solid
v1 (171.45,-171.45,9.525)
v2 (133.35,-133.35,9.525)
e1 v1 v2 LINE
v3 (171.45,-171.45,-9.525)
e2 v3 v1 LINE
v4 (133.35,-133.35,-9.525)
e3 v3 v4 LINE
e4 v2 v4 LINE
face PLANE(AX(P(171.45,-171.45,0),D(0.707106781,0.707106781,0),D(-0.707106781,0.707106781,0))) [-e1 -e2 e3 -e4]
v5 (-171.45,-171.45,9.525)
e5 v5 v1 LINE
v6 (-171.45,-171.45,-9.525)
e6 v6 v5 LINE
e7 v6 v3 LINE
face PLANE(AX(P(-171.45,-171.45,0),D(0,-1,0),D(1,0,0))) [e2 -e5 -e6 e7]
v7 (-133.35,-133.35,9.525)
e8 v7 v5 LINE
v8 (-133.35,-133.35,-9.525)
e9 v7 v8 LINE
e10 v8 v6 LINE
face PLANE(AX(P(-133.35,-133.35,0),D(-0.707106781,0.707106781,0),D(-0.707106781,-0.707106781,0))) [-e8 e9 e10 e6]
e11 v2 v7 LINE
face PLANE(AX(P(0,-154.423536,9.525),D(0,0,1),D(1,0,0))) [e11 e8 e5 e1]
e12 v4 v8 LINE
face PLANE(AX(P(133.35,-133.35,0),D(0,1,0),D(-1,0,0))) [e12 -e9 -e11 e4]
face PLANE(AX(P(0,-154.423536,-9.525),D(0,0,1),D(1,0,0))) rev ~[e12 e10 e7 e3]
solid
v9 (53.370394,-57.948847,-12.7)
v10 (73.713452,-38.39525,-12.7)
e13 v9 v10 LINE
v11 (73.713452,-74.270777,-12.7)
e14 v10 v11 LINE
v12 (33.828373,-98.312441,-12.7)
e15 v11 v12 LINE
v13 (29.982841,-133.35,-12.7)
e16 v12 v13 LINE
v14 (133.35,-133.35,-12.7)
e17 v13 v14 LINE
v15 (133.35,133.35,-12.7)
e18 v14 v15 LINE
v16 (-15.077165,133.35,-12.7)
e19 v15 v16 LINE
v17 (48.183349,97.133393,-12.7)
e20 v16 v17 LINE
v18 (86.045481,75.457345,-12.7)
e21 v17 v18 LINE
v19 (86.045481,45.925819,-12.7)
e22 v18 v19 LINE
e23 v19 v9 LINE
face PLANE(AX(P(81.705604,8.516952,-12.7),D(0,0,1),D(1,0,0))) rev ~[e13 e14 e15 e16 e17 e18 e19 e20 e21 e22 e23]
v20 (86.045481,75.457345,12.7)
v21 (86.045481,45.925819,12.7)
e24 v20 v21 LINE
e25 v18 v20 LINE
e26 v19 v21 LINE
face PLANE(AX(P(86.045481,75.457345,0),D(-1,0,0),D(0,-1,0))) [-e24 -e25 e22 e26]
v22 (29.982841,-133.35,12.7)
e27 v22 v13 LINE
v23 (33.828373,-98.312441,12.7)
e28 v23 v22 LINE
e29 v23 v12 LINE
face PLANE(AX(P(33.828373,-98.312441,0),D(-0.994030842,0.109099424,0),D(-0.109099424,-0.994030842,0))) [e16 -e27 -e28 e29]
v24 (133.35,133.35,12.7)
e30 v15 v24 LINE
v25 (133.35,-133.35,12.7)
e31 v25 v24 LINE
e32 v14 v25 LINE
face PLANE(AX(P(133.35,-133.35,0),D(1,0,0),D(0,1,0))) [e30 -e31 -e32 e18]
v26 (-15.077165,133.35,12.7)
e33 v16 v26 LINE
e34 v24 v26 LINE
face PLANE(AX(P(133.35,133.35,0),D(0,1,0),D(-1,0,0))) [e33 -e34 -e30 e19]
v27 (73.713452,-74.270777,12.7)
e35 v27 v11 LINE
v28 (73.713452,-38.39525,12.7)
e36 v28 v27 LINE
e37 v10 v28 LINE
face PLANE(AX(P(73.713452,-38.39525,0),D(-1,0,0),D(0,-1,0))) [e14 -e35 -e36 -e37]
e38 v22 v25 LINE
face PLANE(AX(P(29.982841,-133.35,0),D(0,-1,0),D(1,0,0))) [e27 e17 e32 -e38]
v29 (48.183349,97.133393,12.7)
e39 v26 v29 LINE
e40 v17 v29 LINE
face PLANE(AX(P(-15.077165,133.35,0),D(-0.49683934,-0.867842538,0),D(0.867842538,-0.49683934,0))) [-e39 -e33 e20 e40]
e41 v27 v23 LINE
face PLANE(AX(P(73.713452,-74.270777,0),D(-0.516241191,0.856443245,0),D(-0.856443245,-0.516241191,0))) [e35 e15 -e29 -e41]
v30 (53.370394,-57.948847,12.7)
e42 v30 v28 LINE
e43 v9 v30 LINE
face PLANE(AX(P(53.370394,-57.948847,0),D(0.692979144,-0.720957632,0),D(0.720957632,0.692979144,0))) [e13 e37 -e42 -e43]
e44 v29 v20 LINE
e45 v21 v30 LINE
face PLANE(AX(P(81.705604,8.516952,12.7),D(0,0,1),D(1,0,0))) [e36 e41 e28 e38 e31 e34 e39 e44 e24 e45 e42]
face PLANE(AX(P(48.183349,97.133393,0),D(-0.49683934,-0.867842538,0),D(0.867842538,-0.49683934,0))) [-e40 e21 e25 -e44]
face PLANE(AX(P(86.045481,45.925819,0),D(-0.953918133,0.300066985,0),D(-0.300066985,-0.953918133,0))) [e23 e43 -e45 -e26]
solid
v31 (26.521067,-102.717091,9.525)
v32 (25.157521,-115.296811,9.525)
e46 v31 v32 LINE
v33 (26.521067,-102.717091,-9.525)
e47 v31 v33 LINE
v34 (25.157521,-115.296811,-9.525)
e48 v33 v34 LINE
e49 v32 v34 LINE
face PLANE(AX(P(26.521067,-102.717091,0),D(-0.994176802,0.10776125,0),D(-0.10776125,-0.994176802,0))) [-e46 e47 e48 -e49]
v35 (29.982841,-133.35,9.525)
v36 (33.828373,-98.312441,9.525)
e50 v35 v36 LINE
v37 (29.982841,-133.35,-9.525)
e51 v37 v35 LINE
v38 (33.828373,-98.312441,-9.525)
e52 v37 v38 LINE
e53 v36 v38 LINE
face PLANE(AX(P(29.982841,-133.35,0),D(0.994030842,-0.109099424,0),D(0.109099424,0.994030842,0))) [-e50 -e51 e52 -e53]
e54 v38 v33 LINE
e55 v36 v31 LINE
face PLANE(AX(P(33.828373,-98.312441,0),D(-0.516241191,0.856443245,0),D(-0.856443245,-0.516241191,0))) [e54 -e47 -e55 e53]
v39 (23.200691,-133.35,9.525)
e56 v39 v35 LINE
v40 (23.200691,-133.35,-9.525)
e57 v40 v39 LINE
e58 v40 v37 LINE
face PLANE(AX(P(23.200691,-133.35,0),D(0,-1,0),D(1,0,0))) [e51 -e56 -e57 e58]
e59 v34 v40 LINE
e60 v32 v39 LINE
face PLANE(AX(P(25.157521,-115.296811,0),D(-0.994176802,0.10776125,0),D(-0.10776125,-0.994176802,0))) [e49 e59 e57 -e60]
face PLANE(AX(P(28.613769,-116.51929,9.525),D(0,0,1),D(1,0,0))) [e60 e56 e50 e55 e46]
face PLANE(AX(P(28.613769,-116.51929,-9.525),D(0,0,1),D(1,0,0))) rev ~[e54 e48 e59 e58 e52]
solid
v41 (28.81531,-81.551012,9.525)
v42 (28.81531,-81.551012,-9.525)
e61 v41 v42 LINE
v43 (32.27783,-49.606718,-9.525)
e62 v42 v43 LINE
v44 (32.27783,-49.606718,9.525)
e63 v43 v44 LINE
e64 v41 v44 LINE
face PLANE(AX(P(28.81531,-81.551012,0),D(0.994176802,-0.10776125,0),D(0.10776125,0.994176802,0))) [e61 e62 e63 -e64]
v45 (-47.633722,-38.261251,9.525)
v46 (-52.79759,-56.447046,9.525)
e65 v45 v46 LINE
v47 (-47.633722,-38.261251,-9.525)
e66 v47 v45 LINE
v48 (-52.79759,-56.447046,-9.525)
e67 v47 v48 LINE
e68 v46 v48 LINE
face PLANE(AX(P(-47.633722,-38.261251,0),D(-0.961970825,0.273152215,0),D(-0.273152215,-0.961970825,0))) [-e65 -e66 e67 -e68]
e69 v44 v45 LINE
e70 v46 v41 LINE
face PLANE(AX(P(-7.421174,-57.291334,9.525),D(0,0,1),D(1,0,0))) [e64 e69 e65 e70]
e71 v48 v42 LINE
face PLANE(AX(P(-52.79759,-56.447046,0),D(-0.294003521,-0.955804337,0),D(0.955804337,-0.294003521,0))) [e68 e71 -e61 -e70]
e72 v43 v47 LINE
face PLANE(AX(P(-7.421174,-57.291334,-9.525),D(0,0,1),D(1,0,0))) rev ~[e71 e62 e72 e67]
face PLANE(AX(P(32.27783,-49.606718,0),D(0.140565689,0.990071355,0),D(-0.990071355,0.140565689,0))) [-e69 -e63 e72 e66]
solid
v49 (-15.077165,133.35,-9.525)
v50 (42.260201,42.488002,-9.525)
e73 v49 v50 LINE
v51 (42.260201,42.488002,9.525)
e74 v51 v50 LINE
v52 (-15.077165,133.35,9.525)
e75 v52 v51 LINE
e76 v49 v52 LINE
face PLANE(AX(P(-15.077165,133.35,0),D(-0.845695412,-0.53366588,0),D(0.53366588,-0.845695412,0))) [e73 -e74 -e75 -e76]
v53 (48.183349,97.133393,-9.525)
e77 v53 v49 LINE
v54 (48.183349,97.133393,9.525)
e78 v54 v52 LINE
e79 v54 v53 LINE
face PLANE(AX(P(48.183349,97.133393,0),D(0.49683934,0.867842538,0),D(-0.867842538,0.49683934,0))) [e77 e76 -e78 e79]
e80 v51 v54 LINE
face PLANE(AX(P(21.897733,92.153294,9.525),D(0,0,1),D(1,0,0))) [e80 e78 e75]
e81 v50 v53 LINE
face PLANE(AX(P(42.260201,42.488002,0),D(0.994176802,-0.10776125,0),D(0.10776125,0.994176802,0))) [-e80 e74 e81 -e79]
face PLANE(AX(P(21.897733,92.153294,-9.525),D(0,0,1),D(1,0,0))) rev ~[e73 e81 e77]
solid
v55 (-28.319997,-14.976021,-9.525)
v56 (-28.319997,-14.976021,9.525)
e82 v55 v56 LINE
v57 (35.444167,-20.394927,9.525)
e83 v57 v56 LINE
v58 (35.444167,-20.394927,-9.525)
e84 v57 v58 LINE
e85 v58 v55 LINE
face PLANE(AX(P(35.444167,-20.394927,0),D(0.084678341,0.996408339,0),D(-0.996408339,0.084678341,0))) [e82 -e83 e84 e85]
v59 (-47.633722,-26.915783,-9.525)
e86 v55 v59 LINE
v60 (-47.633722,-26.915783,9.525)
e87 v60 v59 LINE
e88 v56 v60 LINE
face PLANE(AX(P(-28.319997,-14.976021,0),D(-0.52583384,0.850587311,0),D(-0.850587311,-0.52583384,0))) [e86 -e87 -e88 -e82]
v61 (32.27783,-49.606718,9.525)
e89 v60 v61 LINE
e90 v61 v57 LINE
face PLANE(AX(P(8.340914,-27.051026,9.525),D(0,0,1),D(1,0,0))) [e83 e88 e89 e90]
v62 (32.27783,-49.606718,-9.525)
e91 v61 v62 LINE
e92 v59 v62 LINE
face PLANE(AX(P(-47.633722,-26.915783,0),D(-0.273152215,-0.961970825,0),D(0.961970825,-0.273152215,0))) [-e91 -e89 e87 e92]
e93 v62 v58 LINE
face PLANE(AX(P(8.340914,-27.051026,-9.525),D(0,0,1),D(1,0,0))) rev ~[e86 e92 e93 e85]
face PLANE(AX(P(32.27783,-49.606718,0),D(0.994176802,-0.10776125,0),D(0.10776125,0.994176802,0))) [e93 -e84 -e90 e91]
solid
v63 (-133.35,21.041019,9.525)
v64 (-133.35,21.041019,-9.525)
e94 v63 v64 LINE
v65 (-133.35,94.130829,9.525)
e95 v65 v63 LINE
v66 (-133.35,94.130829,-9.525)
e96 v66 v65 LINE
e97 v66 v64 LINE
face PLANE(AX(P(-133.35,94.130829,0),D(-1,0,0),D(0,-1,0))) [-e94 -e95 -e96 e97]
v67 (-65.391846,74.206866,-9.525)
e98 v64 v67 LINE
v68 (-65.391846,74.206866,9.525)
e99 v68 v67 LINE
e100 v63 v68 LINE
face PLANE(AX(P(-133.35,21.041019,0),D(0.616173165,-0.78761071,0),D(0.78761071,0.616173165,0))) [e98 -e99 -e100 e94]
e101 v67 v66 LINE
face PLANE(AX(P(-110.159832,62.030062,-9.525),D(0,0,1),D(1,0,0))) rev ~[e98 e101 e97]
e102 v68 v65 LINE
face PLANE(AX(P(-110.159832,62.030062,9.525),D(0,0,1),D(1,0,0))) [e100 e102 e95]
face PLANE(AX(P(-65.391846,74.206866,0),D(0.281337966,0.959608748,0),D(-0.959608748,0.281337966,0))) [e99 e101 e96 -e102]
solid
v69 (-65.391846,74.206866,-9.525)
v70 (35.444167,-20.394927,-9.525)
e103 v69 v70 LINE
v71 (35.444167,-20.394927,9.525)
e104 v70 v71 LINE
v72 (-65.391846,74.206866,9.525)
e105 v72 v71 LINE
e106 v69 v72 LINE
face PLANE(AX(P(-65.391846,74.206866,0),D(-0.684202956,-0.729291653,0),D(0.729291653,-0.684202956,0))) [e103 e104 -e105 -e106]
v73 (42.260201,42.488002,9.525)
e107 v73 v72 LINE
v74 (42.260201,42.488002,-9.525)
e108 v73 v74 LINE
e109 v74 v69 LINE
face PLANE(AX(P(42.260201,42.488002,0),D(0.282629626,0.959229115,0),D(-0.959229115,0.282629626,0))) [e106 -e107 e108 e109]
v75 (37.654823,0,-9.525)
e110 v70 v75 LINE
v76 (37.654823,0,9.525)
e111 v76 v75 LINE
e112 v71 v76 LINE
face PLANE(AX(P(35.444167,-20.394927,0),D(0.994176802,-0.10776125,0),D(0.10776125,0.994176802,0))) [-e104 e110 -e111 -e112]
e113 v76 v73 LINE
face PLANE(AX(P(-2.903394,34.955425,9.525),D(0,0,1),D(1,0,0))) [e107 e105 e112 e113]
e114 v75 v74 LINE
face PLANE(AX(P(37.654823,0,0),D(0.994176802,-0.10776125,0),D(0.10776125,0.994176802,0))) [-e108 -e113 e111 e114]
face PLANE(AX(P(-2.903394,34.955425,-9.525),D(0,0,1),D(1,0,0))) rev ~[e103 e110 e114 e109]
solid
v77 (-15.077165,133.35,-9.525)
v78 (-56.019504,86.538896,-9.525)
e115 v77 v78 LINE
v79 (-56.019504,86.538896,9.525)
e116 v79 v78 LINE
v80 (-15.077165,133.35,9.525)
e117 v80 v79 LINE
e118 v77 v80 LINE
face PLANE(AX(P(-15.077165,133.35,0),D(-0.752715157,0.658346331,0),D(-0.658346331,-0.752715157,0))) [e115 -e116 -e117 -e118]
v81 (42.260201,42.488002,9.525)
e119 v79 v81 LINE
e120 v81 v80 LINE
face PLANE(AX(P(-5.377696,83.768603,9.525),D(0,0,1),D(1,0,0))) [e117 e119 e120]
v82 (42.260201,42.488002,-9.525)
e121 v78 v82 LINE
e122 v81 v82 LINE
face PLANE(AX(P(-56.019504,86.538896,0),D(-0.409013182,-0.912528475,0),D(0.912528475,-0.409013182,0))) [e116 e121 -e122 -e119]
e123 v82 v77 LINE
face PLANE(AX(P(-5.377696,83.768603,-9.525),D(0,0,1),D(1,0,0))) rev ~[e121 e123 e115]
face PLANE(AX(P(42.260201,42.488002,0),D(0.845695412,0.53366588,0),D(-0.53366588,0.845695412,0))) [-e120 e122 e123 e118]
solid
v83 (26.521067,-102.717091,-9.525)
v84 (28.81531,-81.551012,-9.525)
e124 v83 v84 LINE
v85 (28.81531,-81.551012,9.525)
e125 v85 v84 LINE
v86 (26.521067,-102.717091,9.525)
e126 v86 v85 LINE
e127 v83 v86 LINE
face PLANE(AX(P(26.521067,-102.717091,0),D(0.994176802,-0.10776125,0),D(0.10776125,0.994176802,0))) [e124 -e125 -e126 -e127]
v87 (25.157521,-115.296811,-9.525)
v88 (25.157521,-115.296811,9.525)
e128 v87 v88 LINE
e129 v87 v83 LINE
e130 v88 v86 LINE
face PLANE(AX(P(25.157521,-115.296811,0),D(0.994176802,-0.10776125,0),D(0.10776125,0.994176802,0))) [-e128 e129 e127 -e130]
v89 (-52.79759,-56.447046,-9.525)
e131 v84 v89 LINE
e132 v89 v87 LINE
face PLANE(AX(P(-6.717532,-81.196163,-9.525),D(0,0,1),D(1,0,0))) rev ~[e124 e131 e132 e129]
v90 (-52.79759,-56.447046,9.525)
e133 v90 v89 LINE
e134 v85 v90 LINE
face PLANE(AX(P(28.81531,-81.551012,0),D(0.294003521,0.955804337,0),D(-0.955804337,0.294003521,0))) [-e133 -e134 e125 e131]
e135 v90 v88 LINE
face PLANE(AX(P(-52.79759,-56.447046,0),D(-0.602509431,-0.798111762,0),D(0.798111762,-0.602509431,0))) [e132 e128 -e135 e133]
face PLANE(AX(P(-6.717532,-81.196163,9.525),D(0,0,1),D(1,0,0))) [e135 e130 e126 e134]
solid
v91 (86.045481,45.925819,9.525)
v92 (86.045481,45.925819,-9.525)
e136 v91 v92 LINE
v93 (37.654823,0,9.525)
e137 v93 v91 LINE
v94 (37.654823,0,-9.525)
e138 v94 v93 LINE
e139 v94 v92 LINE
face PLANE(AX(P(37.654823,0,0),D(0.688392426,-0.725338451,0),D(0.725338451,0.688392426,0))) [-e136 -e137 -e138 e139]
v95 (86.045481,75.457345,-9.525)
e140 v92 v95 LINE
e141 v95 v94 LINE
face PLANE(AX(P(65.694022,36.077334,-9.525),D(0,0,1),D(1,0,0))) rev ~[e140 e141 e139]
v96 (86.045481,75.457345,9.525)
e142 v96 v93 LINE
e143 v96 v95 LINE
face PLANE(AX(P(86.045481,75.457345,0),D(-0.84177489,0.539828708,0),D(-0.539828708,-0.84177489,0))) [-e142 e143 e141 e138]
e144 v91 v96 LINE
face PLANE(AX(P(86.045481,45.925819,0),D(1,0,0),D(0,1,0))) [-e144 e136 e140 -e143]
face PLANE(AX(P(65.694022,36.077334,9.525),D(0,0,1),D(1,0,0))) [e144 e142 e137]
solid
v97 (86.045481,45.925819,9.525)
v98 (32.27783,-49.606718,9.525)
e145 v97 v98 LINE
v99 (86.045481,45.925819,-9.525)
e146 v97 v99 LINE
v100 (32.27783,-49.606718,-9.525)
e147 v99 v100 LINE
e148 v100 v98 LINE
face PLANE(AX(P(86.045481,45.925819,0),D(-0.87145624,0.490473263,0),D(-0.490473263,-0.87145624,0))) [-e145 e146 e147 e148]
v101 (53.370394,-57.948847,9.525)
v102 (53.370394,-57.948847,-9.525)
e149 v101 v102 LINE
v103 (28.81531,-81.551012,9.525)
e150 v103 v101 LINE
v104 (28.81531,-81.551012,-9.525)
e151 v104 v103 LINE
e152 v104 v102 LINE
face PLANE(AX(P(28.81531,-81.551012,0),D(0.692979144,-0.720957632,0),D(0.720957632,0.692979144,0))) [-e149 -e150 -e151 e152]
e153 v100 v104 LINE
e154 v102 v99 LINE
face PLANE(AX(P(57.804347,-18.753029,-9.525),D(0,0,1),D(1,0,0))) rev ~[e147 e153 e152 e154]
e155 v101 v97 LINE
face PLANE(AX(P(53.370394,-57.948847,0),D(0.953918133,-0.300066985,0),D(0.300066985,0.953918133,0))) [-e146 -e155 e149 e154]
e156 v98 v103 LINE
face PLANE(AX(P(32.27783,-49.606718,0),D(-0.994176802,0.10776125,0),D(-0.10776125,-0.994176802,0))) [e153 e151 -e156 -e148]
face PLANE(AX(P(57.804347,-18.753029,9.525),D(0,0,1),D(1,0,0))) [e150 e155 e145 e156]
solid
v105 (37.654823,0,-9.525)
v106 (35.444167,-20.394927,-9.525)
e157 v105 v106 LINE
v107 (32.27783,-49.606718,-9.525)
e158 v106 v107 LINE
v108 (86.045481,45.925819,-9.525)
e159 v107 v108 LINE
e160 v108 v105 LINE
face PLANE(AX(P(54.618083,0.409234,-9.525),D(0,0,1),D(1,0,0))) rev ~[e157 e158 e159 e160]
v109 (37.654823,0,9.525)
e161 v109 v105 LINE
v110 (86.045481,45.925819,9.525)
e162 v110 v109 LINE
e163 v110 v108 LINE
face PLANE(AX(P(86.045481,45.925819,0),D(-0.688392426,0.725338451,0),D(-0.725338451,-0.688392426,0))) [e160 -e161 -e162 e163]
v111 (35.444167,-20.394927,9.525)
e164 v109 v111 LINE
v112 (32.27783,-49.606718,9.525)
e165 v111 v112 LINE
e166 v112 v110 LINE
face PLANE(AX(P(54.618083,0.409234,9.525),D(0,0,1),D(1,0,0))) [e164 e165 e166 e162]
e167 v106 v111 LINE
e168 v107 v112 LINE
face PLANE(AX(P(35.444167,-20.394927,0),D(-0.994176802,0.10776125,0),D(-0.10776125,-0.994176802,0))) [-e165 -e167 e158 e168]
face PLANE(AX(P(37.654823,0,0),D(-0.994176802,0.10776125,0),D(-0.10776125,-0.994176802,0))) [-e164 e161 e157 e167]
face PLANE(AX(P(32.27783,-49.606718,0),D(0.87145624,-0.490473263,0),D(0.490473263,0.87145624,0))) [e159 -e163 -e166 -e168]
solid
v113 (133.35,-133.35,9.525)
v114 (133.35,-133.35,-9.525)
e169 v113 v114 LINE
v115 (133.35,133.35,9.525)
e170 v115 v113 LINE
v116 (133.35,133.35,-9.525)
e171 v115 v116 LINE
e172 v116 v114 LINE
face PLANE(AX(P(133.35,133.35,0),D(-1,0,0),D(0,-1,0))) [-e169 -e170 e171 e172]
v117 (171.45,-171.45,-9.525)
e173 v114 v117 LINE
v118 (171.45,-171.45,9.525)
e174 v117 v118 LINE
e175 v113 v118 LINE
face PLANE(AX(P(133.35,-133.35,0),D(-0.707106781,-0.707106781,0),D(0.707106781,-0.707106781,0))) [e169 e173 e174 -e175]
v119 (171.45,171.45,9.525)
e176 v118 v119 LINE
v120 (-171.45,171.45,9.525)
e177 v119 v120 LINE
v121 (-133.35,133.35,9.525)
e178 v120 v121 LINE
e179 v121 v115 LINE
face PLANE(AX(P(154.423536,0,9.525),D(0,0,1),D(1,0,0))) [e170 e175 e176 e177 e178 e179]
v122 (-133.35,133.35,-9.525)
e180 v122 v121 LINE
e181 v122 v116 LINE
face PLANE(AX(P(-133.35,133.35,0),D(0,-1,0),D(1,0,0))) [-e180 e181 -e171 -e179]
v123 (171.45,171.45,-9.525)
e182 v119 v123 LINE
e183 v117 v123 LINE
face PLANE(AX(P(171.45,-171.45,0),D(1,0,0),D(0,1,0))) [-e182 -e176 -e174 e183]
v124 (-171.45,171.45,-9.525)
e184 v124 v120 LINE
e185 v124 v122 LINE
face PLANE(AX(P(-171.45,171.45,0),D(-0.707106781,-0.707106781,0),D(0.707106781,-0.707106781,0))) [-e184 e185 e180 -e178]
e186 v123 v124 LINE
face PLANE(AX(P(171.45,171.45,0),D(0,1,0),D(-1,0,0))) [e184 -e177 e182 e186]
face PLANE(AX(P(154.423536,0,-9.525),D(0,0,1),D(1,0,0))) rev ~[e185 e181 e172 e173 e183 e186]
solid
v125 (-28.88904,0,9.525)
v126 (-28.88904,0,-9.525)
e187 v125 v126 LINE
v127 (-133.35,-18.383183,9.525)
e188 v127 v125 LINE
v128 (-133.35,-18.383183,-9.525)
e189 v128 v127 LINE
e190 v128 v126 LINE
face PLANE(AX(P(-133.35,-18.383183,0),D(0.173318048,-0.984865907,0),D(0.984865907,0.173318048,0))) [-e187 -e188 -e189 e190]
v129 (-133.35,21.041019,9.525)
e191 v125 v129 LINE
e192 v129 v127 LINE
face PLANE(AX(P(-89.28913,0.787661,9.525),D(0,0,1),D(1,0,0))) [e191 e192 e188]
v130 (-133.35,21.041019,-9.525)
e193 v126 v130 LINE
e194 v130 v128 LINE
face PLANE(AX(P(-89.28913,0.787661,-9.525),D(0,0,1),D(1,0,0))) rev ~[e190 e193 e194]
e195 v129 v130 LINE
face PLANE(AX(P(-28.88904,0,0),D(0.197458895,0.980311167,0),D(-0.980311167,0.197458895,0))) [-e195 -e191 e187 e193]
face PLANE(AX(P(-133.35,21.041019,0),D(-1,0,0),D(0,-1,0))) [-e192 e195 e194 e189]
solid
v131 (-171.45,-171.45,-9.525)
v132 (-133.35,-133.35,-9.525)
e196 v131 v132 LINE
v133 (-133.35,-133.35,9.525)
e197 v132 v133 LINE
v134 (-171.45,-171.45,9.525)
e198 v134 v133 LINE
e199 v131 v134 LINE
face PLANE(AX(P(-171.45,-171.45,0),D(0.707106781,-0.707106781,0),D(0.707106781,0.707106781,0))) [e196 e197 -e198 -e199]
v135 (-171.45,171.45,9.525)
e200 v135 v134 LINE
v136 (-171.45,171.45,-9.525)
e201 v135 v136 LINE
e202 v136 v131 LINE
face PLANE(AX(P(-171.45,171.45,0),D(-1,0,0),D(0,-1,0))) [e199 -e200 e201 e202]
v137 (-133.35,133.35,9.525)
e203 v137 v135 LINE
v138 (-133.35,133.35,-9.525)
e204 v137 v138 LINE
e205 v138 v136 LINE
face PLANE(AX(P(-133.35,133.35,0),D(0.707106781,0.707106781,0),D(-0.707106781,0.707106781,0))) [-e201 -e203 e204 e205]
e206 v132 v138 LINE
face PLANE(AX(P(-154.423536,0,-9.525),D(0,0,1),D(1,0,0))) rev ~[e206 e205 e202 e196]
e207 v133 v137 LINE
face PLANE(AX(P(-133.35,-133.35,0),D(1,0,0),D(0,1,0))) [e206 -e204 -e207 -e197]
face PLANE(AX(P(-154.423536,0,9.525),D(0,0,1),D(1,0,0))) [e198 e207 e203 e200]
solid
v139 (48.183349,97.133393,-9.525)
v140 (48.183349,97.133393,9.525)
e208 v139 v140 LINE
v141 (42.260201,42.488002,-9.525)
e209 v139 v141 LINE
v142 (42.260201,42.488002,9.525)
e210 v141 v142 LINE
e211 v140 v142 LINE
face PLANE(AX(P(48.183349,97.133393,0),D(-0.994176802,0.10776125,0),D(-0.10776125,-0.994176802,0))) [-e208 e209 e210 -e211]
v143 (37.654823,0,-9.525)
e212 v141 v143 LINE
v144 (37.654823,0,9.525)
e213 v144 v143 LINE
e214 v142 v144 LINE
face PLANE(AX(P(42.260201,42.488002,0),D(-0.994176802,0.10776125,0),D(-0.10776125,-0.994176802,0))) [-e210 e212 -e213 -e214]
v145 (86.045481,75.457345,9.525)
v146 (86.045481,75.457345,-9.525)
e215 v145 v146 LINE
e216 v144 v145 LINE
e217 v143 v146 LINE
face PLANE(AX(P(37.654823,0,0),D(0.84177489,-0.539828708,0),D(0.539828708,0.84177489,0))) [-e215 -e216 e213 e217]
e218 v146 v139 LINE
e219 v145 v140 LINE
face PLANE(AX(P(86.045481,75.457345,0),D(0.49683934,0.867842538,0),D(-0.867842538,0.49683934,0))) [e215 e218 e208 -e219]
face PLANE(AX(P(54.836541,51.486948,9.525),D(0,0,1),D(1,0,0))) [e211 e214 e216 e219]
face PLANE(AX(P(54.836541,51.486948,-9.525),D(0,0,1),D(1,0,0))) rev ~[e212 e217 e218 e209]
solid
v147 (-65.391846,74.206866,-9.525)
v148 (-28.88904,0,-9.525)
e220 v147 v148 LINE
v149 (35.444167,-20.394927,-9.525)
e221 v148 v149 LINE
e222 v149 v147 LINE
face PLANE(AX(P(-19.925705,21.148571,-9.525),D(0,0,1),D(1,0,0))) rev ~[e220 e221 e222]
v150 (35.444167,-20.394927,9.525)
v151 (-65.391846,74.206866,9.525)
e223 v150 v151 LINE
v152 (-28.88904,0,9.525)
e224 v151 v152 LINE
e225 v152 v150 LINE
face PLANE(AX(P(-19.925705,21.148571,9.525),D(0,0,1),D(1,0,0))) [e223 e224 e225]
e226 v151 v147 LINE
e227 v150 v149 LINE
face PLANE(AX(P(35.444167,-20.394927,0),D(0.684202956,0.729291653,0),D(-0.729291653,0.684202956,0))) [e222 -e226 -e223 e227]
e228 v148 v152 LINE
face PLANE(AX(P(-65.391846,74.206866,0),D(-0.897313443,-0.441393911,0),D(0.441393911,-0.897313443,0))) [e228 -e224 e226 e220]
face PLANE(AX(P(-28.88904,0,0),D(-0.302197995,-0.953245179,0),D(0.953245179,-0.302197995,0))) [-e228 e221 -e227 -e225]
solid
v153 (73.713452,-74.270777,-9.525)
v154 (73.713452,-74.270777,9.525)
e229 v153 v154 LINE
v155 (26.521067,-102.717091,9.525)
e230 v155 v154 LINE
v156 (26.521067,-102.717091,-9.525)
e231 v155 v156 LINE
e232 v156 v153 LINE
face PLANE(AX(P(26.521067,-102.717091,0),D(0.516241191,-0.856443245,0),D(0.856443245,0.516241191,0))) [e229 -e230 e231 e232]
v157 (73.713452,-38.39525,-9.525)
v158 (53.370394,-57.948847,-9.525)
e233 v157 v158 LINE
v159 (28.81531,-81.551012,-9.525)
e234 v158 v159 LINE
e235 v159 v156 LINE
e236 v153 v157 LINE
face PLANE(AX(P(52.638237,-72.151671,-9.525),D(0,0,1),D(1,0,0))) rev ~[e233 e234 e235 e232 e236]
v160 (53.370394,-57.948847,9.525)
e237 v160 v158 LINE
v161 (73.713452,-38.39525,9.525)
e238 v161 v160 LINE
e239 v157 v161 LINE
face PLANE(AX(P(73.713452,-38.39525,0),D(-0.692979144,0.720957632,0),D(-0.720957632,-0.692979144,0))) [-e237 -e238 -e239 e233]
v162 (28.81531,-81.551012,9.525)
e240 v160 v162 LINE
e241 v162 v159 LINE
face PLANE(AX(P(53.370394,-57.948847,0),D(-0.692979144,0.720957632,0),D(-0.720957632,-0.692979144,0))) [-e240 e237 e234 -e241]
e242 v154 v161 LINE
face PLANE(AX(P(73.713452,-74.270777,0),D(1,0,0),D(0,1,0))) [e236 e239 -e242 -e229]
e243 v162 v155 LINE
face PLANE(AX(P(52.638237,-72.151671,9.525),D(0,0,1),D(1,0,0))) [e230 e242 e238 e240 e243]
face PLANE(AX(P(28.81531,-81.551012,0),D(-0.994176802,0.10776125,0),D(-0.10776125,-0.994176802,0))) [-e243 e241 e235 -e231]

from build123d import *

# Parameters (mm, degrees)
F1_DEPTH  = 9.525
F2_DEPTH  = 9.525
F3_DEPTH  = 9.525
F4_DEPTH  = 9.525
F5_DEPTH  = 9.525
F6_DEPTH  = 9.525
F7_DEPTH  = 9.525
F8_DEPTH  = 9.525
F9_DEPTH  = 9.525
F10_DEPTH = 9.525
F11_DEPTH = 9.525
F12_DEPTH = 9.525
F13_DEPTH = 9.525
F14_DEPTH = 9.525
F15_DEPTH = 9.525
F16_DEPTH = 9.525
F17_DEPTH = 9.525
F18_DEPTH = 9.525
F19_DEPTH = 9.525
F20_DEPTH = 12.7


with BuildPart() as f1:
    # F0 (on Top) → F1 (new body, symmetric)
    with BuildSketch(Plane.XY):
        Polygon((-171.45, 171.45), (-171.45, -171.45), (-133.35, -133.35), (-133.35, -18.3831825852), (-133.35, 21.0410188884), (-133.35, 94.1308289766), (-133.35, 133.35), align=None)
    extrude(amount=F1_DEPTH, both=True)


with BuildPart() as f2:
    # F0 (on Top) → F2 (new body, symmetric)
    with BuildSketch(Plane.XY):
        Polygon((171.45, 171.45), (-171.45, 171.45), (-133.35, 133.35), (-85.5590856828, 133.35), (-15.077165328, 133.35), (133.35, 133.35), align=None)
    extrude(amount=F2_DEPTH, both=True)

    # F0 (on Top) → F3 (join, symmetric)
    with BuildSketch(Plane.XY):
        Polygon((133.35, -133.35), (171.45, -171.45), (171.45, 171.45), (133.35, 133.35), align=None)
    extrude(amount=F3_DEPTH, both=True)


with BuildPart() as f4:
    # F0 (on Top) → F4 (new body, symmetric)
    with BuildSketch(Plane.XY):
        Polygon((-133.35, -133.35), (-171.45, -171.45), (171.45, -171.45), (133.35, -133.35), (29.9828406423, -133.35), (23.2006912545, -133.35), align=None)
    extrude(amount=F4_DEPTH, both=True)


with BuildPart() as f5:
    # F0 (on Top) → F5 (new body, symmetric)
    with BuildSketch(Plane.XY):
        Polygon((42.2602014288, 42.4880021912), (-15.077165328, 133.35), (-56.0195036232, 86.5388959646), align=None)
    extrude(amount=F5_DEPTH, both=True)


with BuildPart() as f6:
    # F0 (on Top) → F6 (new body, symmetric)
    with BuildSketch(Plane.XY):
        Polygon((-52.7975902858, -56.4470457543), (25.1575205185, -115.2968105278), (26.521067056, -102.7170906481), (28.8153099508, -81.5510122196), align=None)
    extrude(amount=F6_DEPTH, both=True)


with BuildPart() as f7:
    # F0 (on Top) → F7 (new body, symmetric)
    with BuildSketch(Plane.XY):
        Polygon((26.521067056, -102.7170906481), (33.8283727055, -98.3124413095), (73.7134516239, -74.2707774043), (73.7134516239, -38.3952504957), (53.3703944978, -57.9488465546), (28.8153099508, -81.5510122196), align=None)
    extrude(amount=F7_DEPTH, both=True)


with BuildPart() as f8:
    # F0 (on Top) → F8 (new body, symmetric)
    with BuildSketch(Plane.XY):
        Polygon((86.0454812646, 45.9258191538), (32.2778299451, -49.606718123), (28.8153099508, -81.5510122196), (53.3703944978, -57.9488465546), align=None)
    extrude(amount=F8_DEPTH, both=True)


with BuildPart() as f9:
    # F0 (on Top) → F9 (new body, symmetric)
    with BuildSketch(Plane.XY):
        Polygon((28.8153099508, -81.5510122196), (32.2778299451, -49.606718123), (-47.6337224245, -38.2612505928), (-52.7975902858, -56.4470457543), align=None)
    extrude(amount=F9_DEPTH, both=True)


with BuildPart() as f10:
    # F0 (on Top) → F10 (new body, symmetric)
    with BuildSketch(Plane.XY):
        Polygon((32.2778299451, -49.606718123), (-28.3199971136, -14.9760207202), (-47.6337224245, -26.9157830626), align=None)
    extrude(amount=F10_DEPTH, both=True)

    # F0 (on Top) → F11 (join, symmetric)
    with BuildSketch(Plane.XY):
        Polygon((35.4441672467, -20.3949272483), (-28.3199971136, -14.9760207202), (32.2778299451, -49.606718123), align=None)
    extrude(amount=F11_DEPTH, both=True)


with BuildPart() as f12:
    # F0 (on Top) → F12 (new body, symmetric)
    with BuildSketch(Plane.XY):
        Polygon((37.6548231832, 0), (35.4441672467, -20.3949272483), (32.2778299451, -49.606718123), (86.0454812646, 45.9258191538), align=None)
    extrude(amount=F12_DEPTH, both=True)


with BuildPart() as f13:
    # F0 (on Top) → F13 (new body, symmetric)
    with BuildSketch(Plane.XY):
        Polygon((86.0454812646, 75.4573446445), (37.6548231832, 0), (86.0454812646, 45.9258191538), align=None)
    extrude(amount=F13_DEPTH, both=True)


with BuildPart() as f14:
    # F0 (on Top) → F14 (new body, symmetric)
    with BuildSketch(Plane.XY):
        Polygon((86.0454812646, 75.4573446445), (48.1833487104, 97.1333931346), (42.2602014288, 42.4880021912), (37.6548231832, 0), align=None)
    extrude(amount=F14_DEPTH, both=True)


with BuildPart() as f15:
    # F0 (on Top) → F15 (new body, symmetric)
    with BuildSketch(Plane.XY):
        Polygon((48.1833487104, 97.1333931346), (-15.077165328, 133.35), (42.2602014288, 42.4880021912), align=None)
    extrude(amount=F15_DEPTH, both=True)


with BuildPart() as f16:
    # F0 (on Top) → F16 (new body, symmetric)
    with BuildSketch(Plane.XY):
        Polygon((42.2602014288, 42.4880021912), (-65.3918460011, 74.2068663239), (35.4441672467, -20.3949272483), (37.6548231832, 0), align=None)
    extrude(amount=F16_DEPTH, both=True)


with BuildPart() as f17:
    # F0 (on Top) → F17 (new body, symmetric)
    with BuildSketch(Plane.XY):
        Polygon((-65.3918460011, 74.2068663239), (-28.8890395314, 0), (35.4441672467, -20.3949272483), align=None)
    extrude(amount=F17_DEPTH, both=True)


with BuildPart() as f18:
    # F0 (on Top) → F18 (new body, symmetric)
    with BuildSketch(Plane.XY):
        Polygon((25.1575205185, -115.2968105278), (23.2006912545, -133.35), (29.9828406423, -133.35), (33.8283727055, -98.3124413095), (26.521067056, -102.7170906481), align=None)
    extrude(amount=F18_DEPTH, both=True)


with BuildPart() as f19:
    # F0 (on Top) → F19 (new body, symmetric)
    with BuildSketch(Plane.XY):
        Polygon((-133.35, 21.0410188884), (-133.35, -18.3831825852), (-28.8890395314, 0), align=None)
    extrude(amount=F19_DEPTH, both=True)


with BuildPart() as f19b:
    # F0 (on Top) → F19, piece 2 (new body, symmetric)
    with BuildSketch(Plane.XY):
        Polygon((-65.3918460011, 74.2068663239), (-133.35, 94.1308289766), (-133.35, 21.0410188884), align=None)
    extrude(amount=F19_DEPTH, both=True)


with BuildPart() as f20:
    # F0 (on Top) → F20 (new body, symmetric)
    with BuildSketch(Plane.XY):
        Polygon((29.9828406423, -133.35), (133.35, -133.35), (133.35, 133.35), (-15.077165328, 133.35), (48.1833487104, 97.1333931346), (86.0454812646, 75.4573446445), (86.0454812646, 45.9258191538), (53.3703944978, -57.9488465546), (73.7134516239, -38.3952504957), (73.7134516239, -74.2707774043), (33.8283727055, -98.3124413095), align=None)
    extrude(amount=F20_DEPTH, both=True)


solid = Compound([f1.part, f2.part, f4.part, f5.part, f6.part, f7.part, f8.part, f9.part, f10.part, f12.part, f13.part, f14.part, f15.part, f16.part, f17.part, f18.part, f19.part, f19b.part, f20.part])
